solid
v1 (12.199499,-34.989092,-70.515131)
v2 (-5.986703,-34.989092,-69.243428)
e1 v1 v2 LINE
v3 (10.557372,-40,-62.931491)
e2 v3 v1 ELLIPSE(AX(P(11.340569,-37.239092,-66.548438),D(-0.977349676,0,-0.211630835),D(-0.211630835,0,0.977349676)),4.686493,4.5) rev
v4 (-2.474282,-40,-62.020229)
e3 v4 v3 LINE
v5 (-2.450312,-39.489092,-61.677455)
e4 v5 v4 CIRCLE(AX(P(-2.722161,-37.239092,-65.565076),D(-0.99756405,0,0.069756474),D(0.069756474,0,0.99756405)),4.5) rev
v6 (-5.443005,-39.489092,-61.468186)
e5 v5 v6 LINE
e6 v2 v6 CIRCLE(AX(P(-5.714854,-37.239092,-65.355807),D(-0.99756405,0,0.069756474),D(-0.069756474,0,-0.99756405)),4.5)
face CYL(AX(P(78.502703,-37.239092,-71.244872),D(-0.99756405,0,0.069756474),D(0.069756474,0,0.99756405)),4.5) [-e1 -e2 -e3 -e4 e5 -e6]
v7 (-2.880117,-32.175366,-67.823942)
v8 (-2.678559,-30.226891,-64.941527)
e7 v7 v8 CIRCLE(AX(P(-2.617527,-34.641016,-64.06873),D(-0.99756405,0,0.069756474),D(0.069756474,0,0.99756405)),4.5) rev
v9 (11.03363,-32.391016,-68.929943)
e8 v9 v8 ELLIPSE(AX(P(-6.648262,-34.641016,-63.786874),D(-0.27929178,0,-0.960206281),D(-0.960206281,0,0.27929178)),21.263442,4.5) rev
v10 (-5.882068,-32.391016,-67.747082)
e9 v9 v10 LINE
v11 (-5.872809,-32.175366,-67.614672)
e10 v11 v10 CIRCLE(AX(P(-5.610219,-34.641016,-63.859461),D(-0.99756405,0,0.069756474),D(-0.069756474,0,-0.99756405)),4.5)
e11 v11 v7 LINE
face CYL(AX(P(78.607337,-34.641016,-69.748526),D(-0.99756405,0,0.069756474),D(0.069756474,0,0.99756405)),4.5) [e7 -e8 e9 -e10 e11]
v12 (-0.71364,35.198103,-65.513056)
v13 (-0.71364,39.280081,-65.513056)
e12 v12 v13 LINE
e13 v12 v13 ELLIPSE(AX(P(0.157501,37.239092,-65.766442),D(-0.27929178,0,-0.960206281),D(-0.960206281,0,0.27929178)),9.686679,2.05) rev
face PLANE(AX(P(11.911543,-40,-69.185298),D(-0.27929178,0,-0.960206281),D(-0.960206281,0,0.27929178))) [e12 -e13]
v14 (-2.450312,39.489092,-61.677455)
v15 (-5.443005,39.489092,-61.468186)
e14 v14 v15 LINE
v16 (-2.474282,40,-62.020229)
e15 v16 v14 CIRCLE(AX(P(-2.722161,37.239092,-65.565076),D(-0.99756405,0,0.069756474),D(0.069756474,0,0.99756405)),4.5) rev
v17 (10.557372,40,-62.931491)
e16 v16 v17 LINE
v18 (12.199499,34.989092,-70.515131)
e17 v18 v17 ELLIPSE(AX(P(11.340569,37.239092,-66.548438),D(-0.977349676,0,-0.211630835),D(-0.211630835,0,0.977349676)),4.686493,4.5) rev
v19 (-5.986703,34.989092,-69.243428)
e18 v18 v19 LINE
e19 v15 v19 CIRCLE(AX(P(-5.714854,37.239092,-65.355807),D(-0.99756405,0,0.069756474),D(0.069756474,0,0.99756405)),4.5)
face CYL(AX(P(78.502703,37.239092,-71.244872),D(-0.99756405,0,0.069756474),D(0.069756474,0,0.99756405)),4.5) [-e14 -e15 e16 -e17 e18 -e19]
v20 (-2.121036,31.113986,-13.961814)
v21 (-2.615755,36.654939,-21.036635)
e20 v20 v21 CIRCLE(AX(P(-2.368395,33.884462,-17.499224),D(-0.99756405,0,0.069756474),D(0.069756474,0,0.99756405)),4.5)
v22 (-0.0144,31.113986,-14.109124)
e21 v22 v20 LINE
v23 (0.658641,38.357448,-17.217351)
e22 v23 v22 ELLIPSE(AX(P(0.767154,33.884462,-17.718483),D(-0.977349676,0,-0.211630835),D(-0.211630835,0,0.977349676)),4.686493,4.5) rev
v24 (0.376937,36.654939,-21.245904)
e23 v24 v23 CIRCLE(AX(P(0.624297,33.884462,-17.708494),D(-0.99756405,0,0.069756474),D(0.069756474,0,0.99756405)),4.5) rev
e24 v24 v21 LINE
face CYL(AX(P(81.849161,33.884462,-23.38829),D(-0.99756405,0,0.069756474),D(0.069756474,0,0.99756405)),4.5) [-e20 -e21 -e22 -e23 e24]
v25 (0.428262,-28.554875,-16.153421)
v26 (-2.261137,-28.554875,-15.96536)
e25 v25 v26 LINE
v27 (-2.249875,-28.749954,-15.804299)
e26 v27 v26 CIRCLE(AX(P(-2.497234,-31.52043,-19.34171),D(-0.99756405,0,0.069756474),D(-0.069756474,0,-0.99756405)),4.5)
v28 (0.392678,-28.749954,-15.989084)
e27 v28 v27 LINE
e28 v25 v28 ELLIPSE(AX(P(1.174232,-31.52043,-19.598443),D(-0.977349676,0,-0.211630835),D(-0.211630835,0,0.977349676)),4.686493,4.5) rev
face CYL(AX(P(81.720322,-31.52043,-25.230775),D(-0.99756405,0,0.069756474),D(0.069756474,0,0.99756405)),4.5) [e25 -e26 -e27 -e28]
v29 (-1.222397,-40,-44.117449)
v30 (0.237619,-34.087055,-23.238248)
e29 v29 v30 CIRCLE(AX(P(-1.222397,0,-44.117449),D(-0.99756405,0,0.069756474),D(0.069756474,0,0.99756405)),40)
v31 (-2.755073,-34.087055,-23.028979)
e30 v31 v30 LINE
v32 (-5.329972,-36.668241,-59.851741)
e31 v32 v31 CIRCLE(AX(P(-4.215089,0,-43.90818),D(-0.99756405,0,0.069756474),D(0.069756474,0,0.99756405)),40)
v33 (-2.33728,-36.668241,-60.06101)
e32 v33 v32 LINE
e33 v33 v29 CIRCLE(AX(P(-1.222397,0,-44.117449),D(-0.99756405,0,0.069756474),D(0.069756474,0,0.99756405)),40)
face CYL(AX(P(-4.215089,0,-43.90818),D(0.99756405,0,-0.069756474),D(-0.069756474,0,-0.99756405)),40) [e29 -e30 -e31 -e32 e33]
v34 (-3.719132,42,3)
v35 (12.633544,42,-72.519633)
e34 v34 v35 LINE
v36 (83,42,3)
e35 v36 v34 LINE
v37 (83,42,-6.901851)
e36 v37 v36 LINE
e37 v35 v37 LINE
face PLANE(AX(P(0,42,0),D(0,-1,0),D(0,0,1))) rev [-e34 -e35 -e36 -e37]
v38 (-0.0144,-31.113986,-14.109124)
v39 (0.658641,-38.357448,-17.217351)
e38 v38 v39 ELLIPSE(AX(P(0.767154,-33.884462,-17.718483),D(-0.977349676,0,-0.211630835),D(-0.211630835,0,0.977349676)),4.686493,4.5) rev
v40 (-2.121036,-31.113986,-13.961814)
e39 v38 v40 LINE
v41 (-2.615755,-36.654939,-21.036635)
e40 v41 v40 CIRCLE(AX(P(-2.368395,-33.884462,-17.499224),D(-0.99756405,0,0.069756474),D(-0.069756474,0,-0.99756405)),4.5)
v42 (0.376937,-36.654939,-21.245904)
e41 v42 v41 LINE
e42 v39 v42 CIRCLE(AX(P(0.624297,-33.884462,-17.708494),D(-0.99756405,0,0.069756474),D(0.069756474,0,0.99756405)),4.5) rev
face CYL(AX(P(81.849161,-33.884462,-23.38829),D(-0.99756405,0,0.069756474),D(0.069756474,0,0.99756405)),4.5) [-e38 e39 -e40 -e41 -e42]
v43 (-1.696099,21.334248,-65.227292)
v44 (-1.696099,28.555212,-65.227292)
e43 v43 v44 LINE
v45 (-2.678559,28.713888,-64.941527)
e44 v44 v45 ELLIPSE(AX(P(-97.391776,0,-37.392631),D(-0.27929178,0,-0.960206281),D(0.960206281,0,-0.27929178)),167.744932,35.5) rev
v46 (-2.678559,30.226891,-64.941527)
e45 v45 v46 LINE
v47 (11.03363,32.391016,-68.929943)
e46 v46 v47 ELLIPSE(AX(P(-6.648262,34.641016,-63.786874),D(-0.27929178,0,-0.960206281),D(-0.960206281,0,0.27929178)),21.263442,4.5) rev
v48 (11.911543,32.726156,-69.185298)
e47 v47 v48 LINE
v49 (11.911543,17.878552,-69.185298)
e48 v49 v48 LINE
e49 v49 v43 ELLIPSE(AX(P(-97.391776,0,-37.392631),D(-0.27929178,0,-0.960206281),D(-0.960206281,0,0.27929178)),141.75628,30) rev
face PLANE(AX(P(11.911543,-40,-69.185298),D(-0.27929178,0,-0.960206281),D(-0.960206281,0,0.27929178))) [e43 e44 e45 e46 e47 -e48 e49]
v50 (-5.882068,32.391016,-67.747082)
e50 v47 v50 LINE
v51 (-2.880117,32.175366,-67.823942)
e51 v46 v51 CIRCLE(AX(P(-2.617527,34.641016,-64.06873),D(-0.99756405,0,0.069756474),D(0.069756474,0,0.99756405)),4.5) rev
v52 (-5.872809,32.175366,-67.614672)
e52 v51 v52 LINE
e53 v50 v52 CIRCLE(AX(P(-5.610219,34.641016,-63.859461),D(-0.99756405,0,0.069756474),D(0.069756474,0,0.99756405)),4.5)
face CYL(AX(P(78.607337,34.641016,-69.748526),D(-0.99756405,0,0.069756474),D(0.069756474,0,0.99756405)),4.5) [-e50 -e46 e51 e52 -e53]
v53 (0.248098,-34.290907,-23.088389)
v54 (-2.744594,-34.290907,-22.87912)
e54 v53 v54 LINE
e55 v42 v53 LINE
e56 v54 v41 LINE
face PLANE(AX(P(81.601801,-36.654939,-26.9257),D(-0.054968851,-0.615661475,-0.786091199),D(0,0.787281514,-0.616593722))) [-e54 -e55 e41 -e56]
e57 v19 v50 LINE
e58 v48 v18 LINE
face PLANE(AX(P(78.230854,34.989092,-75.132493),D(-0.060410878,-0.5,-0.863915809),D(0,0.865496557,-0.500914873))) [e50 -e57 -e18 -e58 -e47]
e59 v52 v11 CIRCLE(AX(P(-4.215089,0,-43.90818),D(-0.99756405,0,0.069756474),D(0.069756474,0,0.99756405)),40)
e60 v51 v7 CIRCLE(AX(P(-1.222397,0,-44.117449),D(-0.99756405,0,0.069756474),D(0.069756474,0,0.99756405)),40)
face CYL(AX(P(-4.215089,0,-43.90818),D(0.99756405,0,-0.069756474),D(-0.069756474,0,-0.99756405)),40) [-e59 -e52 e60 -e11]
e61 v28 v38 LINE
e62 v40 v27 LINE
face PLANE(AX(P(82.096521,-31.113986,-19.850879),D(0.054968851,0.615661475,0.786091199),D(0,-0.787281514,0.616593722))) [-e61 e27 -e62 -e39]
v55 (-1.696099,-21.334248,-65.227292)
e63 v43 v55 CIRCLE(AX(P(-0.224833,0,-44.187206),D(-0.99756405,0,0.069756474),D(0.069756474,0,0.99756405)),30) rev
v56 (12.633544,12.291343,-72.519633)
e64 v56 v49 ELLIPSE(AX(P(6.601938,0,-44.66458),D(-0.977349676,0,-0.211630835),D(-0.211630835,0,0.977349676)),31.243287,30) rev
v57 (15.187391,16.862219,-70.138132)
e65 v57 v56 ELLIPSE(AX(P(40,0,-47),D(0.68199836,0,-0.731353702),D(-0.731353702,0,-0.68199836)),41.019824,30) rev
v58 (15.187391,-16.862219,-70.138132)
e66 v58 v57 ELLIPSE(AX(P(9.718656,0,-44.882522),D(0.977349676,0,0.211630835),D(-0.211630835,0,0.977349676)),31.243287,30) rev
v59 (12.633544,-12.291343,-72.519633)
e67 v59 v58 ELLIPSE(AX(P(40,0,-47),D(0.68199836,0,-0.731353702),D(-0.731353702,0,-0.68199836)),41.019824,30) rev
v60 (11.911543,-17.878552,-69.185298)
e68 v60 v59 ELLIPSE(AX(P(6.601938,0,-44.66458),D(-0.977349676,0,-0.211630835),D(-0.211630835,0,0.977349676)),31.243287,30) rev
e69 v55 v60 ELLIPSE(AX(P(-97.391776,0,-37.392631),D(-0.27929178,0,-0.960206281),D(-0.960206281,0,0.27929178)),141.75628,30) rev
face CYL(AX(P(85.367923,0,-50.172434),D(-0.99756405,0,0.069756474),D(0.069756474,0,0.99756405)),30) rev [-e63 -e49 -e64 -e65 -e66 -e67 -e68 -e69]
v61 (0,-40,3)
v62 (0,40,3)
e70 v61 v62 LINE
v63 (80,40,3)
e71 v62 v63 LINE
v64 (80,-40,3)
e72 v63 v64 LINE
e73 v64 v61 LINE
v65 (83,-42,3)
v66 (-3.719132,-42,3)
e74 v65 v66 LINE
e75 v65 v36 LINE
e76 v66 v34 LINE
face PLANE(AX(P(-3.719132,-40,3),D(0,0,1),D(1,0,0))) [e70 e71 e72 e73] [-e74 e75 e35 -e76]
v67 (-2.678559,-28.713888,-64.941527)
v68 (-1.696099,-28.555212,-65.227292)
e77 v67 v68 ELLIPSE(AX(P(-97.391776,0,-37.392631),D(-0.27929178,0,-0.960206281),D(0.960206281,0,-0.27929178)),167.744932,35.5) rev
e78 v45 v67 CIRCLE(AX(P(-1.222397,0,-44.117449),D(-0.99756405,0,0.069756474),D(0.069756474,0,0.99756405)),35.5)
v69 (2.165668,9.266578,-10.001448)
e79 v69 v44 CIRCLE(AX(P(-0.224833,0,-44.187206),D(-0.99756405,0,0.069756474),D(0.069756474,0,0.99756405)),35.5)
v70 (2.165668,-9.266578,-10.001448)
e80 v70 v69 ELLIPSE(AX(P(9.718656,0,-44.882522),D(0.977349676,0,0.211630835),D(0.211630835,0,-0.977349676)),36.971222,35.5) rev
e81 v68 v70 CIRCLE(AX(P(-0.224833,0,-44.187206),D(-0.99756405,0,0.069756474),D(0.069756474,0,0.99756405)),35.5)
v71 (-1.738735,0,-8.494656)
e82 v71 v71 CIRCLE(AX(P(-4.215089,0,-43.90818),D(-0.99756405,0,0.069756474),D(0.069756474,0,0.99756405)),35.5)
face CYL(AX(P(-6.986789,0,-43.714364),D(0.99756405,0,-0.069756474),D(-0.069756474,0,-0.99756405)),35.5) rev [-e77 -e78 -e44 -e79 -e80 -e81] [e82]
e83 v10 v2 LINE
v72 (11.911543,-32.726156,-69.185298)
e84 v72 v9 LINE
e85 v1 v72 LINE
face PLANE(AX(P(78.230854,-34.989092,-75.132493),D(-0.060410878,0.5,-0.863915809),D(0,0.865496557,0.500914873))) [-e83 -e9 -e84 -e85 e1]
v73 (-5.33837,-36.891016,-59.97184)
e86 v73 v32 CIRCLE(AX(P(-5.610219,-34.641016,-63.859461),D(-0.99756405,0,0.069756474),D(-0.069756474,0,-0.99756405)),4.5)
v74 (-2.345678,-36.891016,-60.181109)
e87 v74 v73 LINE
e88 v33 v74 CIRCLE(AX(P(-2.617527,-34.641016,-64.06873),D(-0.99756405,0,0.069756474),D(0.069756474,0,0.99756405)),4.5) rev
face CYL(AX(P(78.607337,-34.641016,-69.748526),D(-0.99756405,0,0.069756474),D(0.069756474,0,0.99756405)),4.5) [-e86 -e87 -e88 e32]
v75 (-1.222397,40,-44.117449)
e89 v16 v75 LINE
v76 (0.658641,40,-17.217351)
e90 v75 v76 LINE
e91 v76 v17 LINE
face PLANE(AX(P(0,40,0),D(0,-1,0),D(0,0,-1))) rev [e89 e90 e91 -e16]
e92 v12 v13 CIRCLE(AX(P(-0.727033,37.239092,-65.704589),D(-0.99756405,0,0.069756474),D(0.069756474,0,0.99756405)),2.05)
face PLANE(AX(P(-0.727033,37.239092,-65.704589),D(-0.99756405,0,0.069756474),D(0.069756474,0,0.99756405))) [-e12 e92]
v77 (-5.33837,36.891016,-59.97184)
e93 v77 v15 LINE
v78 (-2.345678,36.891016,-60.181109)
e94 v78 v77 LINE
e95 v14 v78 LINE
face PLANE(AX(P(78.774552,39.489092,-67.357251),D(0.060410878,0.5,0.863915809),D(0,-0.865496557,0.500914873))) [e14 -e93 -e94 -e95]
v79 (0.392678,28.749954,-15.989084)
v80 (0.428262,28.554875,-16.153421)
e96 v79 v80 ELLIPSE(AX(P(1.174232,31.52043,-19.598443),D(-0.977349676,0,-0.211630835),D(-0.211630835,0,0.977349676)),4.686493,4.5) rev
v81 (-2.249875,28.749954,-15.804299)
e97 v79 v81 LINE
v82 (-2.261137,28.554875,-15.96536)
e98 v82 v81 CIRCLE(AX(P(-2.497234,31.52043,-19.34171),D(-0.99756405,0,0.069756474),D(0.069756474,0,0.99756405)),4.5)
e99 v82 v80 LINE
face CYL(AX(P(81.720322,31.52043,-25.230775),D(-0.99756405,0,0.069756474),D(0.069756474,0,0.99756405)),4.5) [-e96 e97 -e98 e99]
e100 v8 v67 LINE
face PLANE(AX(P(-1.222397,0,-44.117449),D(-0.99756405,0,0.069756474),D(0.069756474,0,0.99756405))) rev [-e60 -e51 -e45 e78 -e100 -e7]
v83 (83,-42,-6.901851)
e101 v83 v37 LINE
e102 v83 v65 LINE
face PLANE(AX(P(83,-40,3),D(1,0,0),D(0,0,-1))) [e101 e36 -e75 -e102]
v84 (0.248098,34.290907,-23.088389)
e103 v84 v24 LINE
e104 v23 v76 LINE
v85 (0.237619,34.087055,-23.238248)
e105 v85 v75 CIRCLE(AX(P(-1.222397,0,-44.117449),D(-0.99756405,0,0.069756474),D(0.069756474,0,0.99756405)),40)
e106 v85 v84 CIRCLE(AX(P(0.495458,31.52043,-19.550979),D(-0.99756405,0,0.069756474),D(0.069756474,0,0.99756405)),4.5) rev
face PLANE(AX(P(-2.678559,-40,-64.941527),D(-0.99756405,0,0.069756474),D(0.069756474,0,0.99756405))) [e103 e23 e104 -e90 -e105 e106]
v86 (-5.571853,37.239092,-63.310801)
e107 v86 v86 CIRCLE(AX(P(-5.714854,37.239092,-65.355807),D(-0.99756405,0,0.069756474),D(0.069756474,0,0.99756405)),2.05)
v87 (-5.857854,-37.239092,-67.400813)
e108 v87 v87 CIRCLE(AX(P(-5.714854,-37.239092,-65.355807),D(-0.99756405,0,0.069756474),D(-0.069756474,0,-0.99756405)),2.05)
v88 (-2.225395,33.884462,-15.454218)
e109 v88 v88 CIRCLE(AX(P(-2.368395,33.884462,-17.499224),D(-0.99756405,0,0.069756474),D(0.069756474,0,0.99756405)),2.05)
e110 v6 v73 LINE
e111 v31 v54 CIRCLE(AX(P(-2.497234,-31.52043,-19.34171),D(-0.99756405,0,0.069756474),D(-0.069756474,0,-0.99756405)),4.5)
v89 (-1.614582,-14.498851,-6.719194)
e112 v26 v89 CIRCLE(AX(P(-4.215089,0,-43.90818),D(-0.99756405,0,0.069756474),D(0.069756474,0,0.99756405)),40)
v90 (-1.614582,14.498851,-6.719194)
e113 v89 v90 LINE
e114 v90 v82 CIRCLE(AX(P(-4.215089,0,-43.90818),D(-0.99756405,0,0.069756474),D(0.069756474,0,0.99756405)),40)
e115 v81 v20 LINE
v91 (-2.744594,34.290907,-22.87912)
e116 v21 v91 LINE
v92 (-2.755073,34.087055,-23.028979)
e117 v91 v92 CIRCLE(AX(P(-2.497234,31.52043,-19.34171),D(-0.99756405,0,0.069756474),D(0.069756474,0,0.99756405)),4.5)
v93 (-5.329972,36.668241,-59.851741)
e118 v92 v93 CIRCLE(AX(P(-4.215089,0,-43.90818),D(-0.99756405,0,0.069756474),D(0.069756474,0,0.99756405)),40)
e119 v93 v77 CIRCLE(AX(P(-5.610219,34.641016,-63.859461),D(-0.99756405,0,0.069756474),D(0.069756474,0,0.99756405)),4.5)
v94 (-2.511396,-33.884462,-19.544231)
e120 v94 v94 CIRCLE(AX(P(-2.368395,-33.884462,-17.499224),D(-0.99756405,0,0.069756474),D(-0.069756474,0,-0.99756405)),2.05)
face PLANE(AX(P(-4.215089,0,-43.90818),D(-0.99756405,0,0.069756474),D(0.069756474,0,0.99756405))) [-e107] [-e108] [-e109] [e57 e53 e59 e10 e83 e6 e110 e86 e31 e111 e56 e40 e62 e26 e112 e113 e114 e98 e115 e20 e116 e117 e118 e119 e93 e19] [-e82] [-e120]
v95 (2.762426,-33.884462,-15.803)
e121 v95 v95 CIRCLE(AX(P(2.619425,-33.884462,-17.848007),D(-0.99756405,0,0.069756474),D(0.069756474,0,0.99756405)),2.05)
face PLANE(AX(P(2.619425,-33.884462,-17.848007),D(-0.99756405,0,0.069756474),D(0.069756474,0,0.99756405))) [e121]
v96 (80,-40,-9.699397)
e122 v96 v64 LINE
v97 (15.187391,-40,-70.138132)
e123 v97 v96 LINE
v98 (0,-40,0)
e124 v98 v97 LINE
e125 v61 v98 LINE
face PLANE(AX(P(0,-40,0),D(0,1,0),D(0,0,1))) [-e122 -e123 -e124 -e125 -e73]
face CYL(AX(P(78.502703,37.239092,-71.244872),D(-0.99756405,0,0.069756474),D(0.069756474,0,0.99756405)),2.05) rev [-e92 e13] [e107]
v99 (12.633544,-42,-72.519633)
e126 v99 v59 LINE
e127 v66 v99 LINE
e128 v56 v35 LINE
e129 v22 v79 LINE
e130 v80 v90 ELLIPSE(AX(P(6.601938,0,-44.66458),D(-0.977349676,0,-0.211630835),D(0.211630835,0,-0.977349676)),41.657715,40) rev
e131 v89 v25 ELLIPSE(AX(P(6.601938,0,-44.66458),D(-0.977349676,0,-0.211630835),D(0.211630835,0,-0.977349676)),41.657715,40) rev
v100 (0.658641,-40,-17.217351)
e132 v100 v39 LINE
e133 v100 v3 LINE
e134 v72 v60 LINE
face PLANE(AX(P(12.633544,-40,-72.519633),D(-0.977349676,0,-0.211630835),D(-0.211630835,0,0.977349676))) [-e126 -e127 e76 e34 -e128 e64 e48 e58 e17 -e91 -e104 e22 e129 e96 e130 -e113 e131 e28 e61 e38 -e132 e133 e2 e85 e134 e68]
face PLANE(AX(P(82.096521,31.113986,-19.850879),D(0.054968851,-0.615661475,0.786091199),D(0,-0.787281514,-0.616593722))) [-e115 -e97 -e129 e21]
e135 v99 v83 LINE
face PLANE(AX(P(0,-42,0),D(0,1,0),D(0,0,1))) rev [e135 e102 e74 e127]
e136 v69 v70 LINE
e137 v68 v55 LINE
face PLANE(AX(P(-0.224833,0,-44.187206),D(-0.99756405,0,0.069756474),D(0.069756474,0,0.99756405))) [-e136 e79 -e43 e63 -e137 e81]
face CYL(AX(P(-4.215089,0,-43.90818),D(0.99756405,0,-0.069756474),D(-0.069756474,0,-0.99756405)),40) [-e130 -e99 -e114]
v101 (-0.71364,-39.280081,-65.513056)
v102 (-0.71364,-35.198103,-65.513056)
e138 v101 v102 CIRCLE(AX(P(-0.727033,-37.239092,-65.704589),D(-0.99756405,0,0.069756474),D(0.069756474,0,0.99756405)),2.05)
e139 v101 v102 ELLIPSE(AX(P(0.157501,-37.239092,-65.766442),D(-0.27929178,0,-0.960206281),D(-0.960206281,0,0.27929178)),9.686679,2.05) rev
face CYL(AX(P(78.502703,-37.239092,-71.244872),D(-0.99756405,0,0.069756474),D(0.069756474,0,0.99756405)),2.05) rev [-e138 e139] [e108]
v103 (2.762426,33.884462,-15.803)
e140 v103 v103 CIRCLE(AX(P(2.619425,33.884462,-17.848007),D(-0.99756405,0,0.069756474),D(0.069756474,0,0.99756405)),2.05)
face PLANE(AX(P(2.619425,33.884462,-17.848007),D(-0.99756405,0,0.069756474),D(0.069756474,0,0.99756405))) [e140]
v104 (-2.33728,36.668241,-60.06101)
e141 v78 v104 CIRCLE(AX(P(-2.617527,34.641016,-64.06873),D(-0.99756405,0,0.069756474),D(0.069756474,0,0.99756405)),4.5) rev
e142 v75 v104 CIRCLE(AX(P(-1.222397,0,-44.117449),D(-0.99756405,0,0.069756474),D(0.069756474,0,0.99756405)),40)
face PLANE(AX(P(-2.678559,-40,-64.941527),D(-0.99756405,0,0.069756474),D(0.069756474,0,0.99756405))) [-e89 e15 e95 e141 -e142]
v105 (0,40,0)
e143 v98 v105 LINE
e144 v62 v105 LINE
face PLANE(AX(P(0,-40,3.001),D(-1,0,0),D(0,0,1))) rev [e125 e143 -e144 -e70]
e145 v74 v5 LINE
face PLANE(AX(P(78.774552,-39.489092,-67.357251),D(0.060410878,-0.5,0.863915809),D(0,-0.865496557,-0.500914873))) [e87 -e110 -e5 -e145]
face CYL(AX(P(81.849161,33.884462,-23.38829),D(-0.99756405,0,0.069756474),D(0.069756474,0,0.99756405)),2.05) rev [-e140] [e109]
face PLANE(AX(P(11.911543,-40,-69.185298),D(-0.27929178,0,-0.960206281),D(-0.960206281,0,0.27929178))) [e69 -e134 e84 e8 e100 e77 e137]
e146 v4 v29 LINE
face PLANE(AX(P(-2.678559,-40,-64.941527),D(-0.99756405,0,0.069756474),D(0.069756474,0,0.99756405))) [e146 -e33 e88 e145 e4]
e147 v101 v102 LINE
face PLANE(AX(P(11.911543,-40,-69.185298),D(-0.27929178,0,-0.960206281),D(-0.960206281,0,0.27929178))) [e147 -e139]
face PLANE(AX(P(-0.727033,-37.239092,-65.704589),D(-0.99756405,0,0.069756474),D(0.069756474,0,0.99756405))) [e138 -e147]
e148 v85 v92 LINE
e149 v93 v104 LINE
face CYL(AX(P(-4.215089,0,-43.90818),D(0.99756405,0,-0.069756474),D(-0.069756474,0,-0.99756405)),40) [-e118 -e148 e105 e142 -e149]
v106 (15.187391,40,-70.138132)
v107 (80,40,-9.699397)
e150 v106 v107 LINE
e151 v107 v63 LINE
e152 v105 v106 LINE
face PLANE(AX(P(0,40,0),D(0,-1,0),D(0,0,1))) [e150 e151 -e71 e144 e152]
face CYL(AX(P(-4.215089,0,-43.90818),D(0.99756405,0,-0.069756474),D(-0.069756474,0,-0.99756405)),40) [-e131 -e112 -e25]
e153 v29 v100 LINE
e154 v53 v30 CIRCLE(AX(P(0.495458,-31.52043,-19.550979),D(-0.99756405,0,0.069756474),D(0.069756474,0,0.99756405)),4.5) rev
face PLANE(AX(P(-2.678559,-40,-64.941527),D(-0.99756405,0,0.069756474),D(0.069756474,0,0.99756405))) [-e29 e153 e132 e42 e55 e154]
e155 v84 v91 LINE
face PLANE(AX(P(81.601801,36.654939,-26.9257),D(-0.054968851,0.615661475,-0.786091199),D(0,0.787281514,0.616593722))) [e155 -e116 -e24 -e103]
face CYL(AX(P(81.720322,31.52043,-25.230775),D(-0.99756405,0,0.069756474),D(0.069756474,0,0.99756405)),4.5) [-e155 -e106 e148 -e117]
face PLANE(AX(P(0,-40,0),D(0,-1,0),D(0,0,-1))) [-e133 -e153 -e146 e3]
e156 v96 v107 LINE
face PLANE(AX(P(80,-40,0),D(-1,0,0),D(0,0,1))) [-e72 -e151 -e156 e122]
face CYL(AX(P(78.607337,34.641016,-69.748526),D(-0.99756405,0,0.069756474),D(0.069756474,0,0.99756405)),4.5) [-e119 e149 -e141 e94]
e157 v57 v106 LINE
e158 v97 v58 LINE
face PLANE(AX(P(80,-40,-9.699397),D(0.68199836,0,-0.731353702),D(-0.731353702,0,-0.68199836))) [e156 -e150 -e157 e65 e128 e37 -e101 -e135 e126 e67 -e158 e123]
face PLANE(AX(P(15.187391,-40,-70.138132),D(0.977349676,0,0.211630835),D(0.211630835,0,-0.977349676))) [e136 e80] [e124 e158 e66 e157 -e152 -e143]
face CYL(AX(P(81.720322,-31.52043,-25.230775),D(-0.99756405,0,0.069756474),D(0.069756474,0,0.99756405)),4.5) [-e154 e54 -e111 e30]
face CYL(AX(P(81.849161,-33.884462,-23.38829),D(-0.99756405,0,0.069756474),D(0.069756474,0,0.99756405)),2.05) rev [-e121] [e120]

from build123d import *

# Parameters (mm, degrees)
EXTRUDE_1_DEPTH                 = 40
EXTRUDE_1_DEPTH_BACK            = 40
EXTRUDE_2_DEPTH                 = 2
CUT_EXTRUDE_1_REACH             = 119.95
SKETCH_5_W                      = 80
SKETCH_5_H                      = 80
EXTRUDE_3_DEPTH                 = 40
EXTRUDE_3_DEPTH_BACK            = 40
SKETCH_8_R                      = 35.5
CUT_EXTRUDE_2_DEPTH             = 1
CUT_EXTRUDE_2_DIRECTION_2_REACH = 118.572
EXTRUDE_START                   = 3
SKETCH_9_R                      = 40
SKETCH_9_R_2                    = 35.5
EXTRUDE_4_DEPTH                 = 3
CUT_EXTRUDE_3_REACH             = 127.349
SKETCH_10_W                     = 71.763601152
SKETCH_10_H                     = 80
CUT_EXTRUDE_4_REACH             = 128.159
SKETCH_11_R                     = 30
EXTRUDE_5_REACH                 = 128.159
SKETCH_12_R                     = 2.05
SKETCH_13_R                     = 2.05
CUT_EXTRUDE_5_DEPTH             = 5


with BuildPart() as part:
    # 草图3 → 凸台-拉伸1 (new, two sides: drawn at the far end of the back side and taken through both)
    with BuildSketch(Plane(origin=(0, 0, 0), x_dir=(1, 0, 0), z_dir=(0, 1, 0)).offset(-EXTRUDE_1_DEPTH_BACK)):
        Polygon((15.187390863, 70.138132347), (0, 0), (80, 0), (80, 9.699396554), (83, 6.901851296), (83, -3), (-3.719132052, -3), (12.633544334, 72.519632763), align=None)
    extrude(amount=EXTRUDE_1_DEPTH + EXTRUDE_1_DEPTH_BACK)

    # 草图4 → 凸台-拉伸2 (add)
    with BuildSketch(Plane.XZ.offset(40)):
        Polygon((12.633544334, -72.519632763), (83, -6.901851296), (83, 3), (-3.719132052, 3), align=None)
    extrude_2 = extrude(amount=EXTRUDE_2_DEPTH)

    # 镜向1: 凸台-拉伸2 across plane
    add(extrude_2.mirror(Plane.ZX))

    # 草图5 → 切除-拉伸1 (cut, up to next)
    with BuildSketch(Plane(origin=(0, 0, 0), x_dir=(-1, 0, 0), z_dir=(0, 0, -1)), mode=Mode.PRIVATE) as cut_extrude_1_sk1:
        with Locations((-40, 0)):
            Rectangle(SKETCH_5_W, SKETCH_5_H)
    cut_extrude_1_tool1 = extrude(cut_extrude_1_sk1.sketch, amount=-CUT_EXTRUDE_1_REACH, mode=Mode.PRIVATE) & part.part
    add(cut_extrude_1_tool1.solids().sort_by_distance((40, 0, 0))[0], mode=Mode.SUBTRACT)

    # 草图7 → 凸台-拉伸3 (add, two sides: drawn at the far end of the back side and taken through both)
    with BuildSketch(Plane(origin=(0, 0, 0), x_dir=(1, 0, 0), z_dir=(0, 1, 0)).offset(-EXTRUDE_3_DEPTH_BACK)):
        Polygon((0.658640833, 17.217351141), (11.911542727, 69.185298069), (-2.678558655, 64.941527254), align=None)
    extrude(amount=EXTRUDE_3_DEPTH + EXTRUDE_3_DEPTH_BACK)

    # 草图8 → 切除-拉伸2 (cut)
    with BuildSketch(Plane(origin=(1.853531984, 0, -0.129611582), x_dir=(0.06975647374411541, 0, 0.997564050259825), z_dir=(-0.9975640502598251, 0, 0.06975647374411541))):
        with Locations((-44.095251412, 0)):
            Circle(SKETCH_8_R)
    extrude(amount=-CUT_EXTRUDE_2_DEPTH, mode=Mode.SUBTRACT)

    # 草图8 → 切除-拉伸2 direction 2 (cut, up to next)
    with BuildSketch(Plane(origin=(1.853531984, 0, -0.129611582), x_dir=(0.06975647374411541, 0, 0.997564050259825), z_dir=(-0.9975640502598251, 0, 0.06975647374411541)), mode=Mode.PRIVATE) as cut_extrude_2_direction_2_sk1:
        with Locations((-44.095251412, 0)):
            Circle(SKETCH_8_R)
    cut_extrude_2_direction_2_tool1 = extrude(cut_extrude_2_direction_2_sk1.sketch, amount=CUT_EXTRUDE_2_DIRECTION_2_REACH, mode=Mode.PRIVATE) & part.part
    add(cut_extrude_2_direction_2_tool1.solids().sort_by_distance((-1.222397, 0, -44.117449))[0], mode=Mode.SUBTRACT)

    # 草图9 → 凸台-拉伸4 (add)
    with BuildSketch(Plane(origin=(1.853531984, 0, -0.129611582), x_dir=(0.06975647374411541, 0, 0.997564050259825), z_dir=(-0.9975640502598251, 0, 0.06975647374411541)).offset(EXTRUDE_START)):
        with Locations((-44.095251412, 0)):
            Circle(SKETCH_9_R)
        with Locations((-44.095251412, 0)):
            Circle(SKETCH_9_R_2, mode=Mode.SUBTRACT)
    extrude(amount=-EXTRUDE_4_DEPTH)

    # 草图10 → 切除-拉伸3 (cut, up to next)
    with BuildSketch(Plane(origin=(0, 0, 0), x_dir=(0.21163083539135819, 0, -0.9773496761709987), z_dir=(0.9773496761709987, 0, 0.21163083539135819)), mode=Mode.PRIVATE) as cut_extrude_3_sk1:
        with Locations((35.881800576, 0)):
            Rectangle(SKETCH_10_W, SKETCH_10_H)
    cut_extrude_3_tool1 = extrude(cut_extrude_3_sk1.sketch, amount=CUT_EXTRUDE_3_REACH, mode=Mode.PRIVATE) & part.part
    add(cut_extrude_3_tool1.solids().sort_by_distance((7.593695, 0, -35.069066))[0], mode=Mode.SUBTRACT)

    # 草图11 → 切除-拉伸4 (cut, up to next)
    with BuildSketch(Plane(origin=(-1.139160167, 0, 0.079657839), x_dir=(0.06975647374411542, 0, 0.997564050259825), z_dir=(-0.9975640502598251, 0, 0.06975647374411542)), mode=Mode.PRIVATE) as cut_extrude_4_sk1:
        with Locations((-44.095251412, 0)):
            Circle(SKETCH_11_R)
    cut_extrude_4_tool1 = extrude(cut_extrude_4_sk1.sketch, amount=-CUT_EXTRUDE_4_REACH, mode=Mode.PRIVATE) & part.part
    add(cut_extrude_4_tool1.solids().sort_by_distance((-4.215089, 0, -43.90818))[0], mode=Mode.SUBTRACT)

    # 草图12 → 凸台-拉伸5 (add, up to next)
    with BuildSketch(Plane(origin=(-1.139160167, 0, 0.079657839), x_dir=(0.06975647374411542, 0, 0.997564050259825), z_dir=(-0.9975640502598251, 0, 0.06975647374411542)), mode=Mode.PRIVATE) as extrude_5_sk1:
        with BuildLine():
            Line((-61.698137095, 39.489092363), (-60.198137095, 36.891016151))
            ThreePointArc((-60.198137095, 36.891016151), (-61.845251412, 30.743901834), (-67.992365729, 32.391016151))
            Line((-67.992365729, 32.391016151), (-69.492365729, 34.989092363))
            ThreePointArc((-69.492365729, 34.989092363), (-67.845251412, 41.13620668), (-61.698137095, 39.489092363))
        make_face()
        with Locations((-65.595251412, 37.239092363)):
            Circle(SKETCH_12_R, mode=Mode.SUBTRACT)
    extrude_5_tool1 = extrude(extrude_5_sk1.sketch, amount=-EXTRUDE_5_REACH, mode=Mode.PRIVATE) - part.part
    # 草图12 → 凸台-拉伸5 (add, up to next)
    with BuildSketch(Plane(origin=(-1.139160167, 0, 0.079657839), x_dir=(0.06975647374411542, 0, 0.997564050259825), z_dir=(-0.9975640502598251, 0, 0.06975647374411542)), mode=Mode.PRIVATE) as extrude_5_sk2:
        with BuildLine():
            Line((-14.075759582, 31.113985766), (-15.922744008, 28.749953505))
            ThreePointArc((-15.922744008, 28.749953505), (-22.239269038, 27.974381753), (-23.014840791, 34.290906783))
            Line((-23.014840791, 34.290906783), (-21.167856365, 36.654939044))
            ThreePointArc((-21.167856365, 36.654939044), (-14.851331334, 37.430510796), (-14.075759582, 31.113985766))
        make_face()
        with Locations((-17.621807973, 33.884462405)):
            Circle(SKETCH_12_R, mode=Mode.SUBTRACT)
    extrude_5_tool2 = extrude(extrude_5_sk2.sketch, amount=-EXTRUDE_5_REACH, mode=Mode.PRIVATE) - part.part
    # 草图12 → 凸台-拉伸5 (add, up to next)
    with BuildSketch(Plane(origin=(-1.139160167, 0, 0.079657839), x_dir=(0.06975647374411542, 0, 0.997564050259825), z_dir=(-0.9975640502598251, 0, 0.06975647374411542)), mode=Mode.PRIVATE) as extrude_5_sk3:
        with BuildLine():
            Line((-14.075759582, -31.113985766), (-15.922744008, -28.749953505))
            ThreePointArc((-15.922744008, -28.749953505), (-22.239269038, -27.974381753), (-23.014840791, -34.290906783))
            Line((-23.014840791, -34.290906783), (-21.167856365, -36.654939044))
            ThreePointArc((-21.167856365, -36.654939044), (-14.851331334, -37.430510796), (-14.075759582, -31.113985766))
        make_face()
        with Locations((-17.621807973, -33.884462405)):
            Circle(SKETCH_12_R, mode=Mode.SUBTRACT)
    extrude_5_tool3 = extrude(extrude_5_sk3.sketch, amount=-EXTRUDE_5_REACH, mode=Mode.PRIVATE) - part.part
    # 草图12 → 凸台-拉伸5 (add, up to next)
    with BuildSketch(Plane(origin=(-1.139160167, 0, 0.079657839), x_dir=(0.06975647374411542, 0, 0.997564050259825), z_dir=(-0.9975640502598251, 0, 0.06975647374411542)), mode=Mode.PRIVATE) as extrude_5_sk4:
        with BuildLine():
            Line((-61.698137095, -39.489092363), (-60.198137095, -36.891016151))
            ThreePointArc((-60.198137095, -36.891016151), (-61.845251412, -30.743901834), (-67.992365729, -32.391016151))
            Line((-67.992365729, -32.391016151), (-69.492365729, -34.989092363))
            ThreePointArc((-69.492365729, -34.989092363), (-67.845251412, -41.13620668), (-61.698137095, -39.489092363))
        make_face()
        with Locations((-65.595251412, -37.239092363)):
            Circle(SKETCH_12_R, mode=Mode.SUBTRACT)
    extrude_5_tool4 = extrude(extrude_5_sk4.sketch, amount=-EXTRUDE_5_REACH, mode=Mode.PRIVATE) - part.part
    add(extrude_5_tool1.solids().sort_by_distance((-5.400139, 38.111829, -60.855172))[0])
    add(extrude_5_tool2.solids().sort_by_distance((-2.194091, 30.028689, -15.00655))[0])
    add(extrude_5_tool3.solids().sort_by_distance((-2.194091, -30.028689, -15.00655))[0])
    add(extrude_5_tool4.solids().sort_by_distance((-5.400139, -38.111829, -60.855172))[0])

    # 草图13 → 切除-拉伸5 (cut)
    with BuildSketch(Plane(origin=(-1.139160167, 0, 0.079657839), x_dir=(0.06975647374411542, 0, 0.997564050259825), z_dir=(-0.9975640502598251, 0, 0.06975647374411542))):
        with Locations((-65.595251412, -37.239092363)):
            Circle(SKETCH_13_R)
        with Locations((-17.621807973, -33.884462405)):
            Circle(SKETCH_13_R)
        with Locations((-17.621807973, 33.884462405)):
            Circle(SKETCH_13_R)
        with Locations((-65.595251412, 37.239092363)):
            Circle(SKETCH_13_R)
    extrude(amount=-CUT_EXTRUDE_5_DEPTH, mode=Mode.SUBTRACT)


solid = part.part
